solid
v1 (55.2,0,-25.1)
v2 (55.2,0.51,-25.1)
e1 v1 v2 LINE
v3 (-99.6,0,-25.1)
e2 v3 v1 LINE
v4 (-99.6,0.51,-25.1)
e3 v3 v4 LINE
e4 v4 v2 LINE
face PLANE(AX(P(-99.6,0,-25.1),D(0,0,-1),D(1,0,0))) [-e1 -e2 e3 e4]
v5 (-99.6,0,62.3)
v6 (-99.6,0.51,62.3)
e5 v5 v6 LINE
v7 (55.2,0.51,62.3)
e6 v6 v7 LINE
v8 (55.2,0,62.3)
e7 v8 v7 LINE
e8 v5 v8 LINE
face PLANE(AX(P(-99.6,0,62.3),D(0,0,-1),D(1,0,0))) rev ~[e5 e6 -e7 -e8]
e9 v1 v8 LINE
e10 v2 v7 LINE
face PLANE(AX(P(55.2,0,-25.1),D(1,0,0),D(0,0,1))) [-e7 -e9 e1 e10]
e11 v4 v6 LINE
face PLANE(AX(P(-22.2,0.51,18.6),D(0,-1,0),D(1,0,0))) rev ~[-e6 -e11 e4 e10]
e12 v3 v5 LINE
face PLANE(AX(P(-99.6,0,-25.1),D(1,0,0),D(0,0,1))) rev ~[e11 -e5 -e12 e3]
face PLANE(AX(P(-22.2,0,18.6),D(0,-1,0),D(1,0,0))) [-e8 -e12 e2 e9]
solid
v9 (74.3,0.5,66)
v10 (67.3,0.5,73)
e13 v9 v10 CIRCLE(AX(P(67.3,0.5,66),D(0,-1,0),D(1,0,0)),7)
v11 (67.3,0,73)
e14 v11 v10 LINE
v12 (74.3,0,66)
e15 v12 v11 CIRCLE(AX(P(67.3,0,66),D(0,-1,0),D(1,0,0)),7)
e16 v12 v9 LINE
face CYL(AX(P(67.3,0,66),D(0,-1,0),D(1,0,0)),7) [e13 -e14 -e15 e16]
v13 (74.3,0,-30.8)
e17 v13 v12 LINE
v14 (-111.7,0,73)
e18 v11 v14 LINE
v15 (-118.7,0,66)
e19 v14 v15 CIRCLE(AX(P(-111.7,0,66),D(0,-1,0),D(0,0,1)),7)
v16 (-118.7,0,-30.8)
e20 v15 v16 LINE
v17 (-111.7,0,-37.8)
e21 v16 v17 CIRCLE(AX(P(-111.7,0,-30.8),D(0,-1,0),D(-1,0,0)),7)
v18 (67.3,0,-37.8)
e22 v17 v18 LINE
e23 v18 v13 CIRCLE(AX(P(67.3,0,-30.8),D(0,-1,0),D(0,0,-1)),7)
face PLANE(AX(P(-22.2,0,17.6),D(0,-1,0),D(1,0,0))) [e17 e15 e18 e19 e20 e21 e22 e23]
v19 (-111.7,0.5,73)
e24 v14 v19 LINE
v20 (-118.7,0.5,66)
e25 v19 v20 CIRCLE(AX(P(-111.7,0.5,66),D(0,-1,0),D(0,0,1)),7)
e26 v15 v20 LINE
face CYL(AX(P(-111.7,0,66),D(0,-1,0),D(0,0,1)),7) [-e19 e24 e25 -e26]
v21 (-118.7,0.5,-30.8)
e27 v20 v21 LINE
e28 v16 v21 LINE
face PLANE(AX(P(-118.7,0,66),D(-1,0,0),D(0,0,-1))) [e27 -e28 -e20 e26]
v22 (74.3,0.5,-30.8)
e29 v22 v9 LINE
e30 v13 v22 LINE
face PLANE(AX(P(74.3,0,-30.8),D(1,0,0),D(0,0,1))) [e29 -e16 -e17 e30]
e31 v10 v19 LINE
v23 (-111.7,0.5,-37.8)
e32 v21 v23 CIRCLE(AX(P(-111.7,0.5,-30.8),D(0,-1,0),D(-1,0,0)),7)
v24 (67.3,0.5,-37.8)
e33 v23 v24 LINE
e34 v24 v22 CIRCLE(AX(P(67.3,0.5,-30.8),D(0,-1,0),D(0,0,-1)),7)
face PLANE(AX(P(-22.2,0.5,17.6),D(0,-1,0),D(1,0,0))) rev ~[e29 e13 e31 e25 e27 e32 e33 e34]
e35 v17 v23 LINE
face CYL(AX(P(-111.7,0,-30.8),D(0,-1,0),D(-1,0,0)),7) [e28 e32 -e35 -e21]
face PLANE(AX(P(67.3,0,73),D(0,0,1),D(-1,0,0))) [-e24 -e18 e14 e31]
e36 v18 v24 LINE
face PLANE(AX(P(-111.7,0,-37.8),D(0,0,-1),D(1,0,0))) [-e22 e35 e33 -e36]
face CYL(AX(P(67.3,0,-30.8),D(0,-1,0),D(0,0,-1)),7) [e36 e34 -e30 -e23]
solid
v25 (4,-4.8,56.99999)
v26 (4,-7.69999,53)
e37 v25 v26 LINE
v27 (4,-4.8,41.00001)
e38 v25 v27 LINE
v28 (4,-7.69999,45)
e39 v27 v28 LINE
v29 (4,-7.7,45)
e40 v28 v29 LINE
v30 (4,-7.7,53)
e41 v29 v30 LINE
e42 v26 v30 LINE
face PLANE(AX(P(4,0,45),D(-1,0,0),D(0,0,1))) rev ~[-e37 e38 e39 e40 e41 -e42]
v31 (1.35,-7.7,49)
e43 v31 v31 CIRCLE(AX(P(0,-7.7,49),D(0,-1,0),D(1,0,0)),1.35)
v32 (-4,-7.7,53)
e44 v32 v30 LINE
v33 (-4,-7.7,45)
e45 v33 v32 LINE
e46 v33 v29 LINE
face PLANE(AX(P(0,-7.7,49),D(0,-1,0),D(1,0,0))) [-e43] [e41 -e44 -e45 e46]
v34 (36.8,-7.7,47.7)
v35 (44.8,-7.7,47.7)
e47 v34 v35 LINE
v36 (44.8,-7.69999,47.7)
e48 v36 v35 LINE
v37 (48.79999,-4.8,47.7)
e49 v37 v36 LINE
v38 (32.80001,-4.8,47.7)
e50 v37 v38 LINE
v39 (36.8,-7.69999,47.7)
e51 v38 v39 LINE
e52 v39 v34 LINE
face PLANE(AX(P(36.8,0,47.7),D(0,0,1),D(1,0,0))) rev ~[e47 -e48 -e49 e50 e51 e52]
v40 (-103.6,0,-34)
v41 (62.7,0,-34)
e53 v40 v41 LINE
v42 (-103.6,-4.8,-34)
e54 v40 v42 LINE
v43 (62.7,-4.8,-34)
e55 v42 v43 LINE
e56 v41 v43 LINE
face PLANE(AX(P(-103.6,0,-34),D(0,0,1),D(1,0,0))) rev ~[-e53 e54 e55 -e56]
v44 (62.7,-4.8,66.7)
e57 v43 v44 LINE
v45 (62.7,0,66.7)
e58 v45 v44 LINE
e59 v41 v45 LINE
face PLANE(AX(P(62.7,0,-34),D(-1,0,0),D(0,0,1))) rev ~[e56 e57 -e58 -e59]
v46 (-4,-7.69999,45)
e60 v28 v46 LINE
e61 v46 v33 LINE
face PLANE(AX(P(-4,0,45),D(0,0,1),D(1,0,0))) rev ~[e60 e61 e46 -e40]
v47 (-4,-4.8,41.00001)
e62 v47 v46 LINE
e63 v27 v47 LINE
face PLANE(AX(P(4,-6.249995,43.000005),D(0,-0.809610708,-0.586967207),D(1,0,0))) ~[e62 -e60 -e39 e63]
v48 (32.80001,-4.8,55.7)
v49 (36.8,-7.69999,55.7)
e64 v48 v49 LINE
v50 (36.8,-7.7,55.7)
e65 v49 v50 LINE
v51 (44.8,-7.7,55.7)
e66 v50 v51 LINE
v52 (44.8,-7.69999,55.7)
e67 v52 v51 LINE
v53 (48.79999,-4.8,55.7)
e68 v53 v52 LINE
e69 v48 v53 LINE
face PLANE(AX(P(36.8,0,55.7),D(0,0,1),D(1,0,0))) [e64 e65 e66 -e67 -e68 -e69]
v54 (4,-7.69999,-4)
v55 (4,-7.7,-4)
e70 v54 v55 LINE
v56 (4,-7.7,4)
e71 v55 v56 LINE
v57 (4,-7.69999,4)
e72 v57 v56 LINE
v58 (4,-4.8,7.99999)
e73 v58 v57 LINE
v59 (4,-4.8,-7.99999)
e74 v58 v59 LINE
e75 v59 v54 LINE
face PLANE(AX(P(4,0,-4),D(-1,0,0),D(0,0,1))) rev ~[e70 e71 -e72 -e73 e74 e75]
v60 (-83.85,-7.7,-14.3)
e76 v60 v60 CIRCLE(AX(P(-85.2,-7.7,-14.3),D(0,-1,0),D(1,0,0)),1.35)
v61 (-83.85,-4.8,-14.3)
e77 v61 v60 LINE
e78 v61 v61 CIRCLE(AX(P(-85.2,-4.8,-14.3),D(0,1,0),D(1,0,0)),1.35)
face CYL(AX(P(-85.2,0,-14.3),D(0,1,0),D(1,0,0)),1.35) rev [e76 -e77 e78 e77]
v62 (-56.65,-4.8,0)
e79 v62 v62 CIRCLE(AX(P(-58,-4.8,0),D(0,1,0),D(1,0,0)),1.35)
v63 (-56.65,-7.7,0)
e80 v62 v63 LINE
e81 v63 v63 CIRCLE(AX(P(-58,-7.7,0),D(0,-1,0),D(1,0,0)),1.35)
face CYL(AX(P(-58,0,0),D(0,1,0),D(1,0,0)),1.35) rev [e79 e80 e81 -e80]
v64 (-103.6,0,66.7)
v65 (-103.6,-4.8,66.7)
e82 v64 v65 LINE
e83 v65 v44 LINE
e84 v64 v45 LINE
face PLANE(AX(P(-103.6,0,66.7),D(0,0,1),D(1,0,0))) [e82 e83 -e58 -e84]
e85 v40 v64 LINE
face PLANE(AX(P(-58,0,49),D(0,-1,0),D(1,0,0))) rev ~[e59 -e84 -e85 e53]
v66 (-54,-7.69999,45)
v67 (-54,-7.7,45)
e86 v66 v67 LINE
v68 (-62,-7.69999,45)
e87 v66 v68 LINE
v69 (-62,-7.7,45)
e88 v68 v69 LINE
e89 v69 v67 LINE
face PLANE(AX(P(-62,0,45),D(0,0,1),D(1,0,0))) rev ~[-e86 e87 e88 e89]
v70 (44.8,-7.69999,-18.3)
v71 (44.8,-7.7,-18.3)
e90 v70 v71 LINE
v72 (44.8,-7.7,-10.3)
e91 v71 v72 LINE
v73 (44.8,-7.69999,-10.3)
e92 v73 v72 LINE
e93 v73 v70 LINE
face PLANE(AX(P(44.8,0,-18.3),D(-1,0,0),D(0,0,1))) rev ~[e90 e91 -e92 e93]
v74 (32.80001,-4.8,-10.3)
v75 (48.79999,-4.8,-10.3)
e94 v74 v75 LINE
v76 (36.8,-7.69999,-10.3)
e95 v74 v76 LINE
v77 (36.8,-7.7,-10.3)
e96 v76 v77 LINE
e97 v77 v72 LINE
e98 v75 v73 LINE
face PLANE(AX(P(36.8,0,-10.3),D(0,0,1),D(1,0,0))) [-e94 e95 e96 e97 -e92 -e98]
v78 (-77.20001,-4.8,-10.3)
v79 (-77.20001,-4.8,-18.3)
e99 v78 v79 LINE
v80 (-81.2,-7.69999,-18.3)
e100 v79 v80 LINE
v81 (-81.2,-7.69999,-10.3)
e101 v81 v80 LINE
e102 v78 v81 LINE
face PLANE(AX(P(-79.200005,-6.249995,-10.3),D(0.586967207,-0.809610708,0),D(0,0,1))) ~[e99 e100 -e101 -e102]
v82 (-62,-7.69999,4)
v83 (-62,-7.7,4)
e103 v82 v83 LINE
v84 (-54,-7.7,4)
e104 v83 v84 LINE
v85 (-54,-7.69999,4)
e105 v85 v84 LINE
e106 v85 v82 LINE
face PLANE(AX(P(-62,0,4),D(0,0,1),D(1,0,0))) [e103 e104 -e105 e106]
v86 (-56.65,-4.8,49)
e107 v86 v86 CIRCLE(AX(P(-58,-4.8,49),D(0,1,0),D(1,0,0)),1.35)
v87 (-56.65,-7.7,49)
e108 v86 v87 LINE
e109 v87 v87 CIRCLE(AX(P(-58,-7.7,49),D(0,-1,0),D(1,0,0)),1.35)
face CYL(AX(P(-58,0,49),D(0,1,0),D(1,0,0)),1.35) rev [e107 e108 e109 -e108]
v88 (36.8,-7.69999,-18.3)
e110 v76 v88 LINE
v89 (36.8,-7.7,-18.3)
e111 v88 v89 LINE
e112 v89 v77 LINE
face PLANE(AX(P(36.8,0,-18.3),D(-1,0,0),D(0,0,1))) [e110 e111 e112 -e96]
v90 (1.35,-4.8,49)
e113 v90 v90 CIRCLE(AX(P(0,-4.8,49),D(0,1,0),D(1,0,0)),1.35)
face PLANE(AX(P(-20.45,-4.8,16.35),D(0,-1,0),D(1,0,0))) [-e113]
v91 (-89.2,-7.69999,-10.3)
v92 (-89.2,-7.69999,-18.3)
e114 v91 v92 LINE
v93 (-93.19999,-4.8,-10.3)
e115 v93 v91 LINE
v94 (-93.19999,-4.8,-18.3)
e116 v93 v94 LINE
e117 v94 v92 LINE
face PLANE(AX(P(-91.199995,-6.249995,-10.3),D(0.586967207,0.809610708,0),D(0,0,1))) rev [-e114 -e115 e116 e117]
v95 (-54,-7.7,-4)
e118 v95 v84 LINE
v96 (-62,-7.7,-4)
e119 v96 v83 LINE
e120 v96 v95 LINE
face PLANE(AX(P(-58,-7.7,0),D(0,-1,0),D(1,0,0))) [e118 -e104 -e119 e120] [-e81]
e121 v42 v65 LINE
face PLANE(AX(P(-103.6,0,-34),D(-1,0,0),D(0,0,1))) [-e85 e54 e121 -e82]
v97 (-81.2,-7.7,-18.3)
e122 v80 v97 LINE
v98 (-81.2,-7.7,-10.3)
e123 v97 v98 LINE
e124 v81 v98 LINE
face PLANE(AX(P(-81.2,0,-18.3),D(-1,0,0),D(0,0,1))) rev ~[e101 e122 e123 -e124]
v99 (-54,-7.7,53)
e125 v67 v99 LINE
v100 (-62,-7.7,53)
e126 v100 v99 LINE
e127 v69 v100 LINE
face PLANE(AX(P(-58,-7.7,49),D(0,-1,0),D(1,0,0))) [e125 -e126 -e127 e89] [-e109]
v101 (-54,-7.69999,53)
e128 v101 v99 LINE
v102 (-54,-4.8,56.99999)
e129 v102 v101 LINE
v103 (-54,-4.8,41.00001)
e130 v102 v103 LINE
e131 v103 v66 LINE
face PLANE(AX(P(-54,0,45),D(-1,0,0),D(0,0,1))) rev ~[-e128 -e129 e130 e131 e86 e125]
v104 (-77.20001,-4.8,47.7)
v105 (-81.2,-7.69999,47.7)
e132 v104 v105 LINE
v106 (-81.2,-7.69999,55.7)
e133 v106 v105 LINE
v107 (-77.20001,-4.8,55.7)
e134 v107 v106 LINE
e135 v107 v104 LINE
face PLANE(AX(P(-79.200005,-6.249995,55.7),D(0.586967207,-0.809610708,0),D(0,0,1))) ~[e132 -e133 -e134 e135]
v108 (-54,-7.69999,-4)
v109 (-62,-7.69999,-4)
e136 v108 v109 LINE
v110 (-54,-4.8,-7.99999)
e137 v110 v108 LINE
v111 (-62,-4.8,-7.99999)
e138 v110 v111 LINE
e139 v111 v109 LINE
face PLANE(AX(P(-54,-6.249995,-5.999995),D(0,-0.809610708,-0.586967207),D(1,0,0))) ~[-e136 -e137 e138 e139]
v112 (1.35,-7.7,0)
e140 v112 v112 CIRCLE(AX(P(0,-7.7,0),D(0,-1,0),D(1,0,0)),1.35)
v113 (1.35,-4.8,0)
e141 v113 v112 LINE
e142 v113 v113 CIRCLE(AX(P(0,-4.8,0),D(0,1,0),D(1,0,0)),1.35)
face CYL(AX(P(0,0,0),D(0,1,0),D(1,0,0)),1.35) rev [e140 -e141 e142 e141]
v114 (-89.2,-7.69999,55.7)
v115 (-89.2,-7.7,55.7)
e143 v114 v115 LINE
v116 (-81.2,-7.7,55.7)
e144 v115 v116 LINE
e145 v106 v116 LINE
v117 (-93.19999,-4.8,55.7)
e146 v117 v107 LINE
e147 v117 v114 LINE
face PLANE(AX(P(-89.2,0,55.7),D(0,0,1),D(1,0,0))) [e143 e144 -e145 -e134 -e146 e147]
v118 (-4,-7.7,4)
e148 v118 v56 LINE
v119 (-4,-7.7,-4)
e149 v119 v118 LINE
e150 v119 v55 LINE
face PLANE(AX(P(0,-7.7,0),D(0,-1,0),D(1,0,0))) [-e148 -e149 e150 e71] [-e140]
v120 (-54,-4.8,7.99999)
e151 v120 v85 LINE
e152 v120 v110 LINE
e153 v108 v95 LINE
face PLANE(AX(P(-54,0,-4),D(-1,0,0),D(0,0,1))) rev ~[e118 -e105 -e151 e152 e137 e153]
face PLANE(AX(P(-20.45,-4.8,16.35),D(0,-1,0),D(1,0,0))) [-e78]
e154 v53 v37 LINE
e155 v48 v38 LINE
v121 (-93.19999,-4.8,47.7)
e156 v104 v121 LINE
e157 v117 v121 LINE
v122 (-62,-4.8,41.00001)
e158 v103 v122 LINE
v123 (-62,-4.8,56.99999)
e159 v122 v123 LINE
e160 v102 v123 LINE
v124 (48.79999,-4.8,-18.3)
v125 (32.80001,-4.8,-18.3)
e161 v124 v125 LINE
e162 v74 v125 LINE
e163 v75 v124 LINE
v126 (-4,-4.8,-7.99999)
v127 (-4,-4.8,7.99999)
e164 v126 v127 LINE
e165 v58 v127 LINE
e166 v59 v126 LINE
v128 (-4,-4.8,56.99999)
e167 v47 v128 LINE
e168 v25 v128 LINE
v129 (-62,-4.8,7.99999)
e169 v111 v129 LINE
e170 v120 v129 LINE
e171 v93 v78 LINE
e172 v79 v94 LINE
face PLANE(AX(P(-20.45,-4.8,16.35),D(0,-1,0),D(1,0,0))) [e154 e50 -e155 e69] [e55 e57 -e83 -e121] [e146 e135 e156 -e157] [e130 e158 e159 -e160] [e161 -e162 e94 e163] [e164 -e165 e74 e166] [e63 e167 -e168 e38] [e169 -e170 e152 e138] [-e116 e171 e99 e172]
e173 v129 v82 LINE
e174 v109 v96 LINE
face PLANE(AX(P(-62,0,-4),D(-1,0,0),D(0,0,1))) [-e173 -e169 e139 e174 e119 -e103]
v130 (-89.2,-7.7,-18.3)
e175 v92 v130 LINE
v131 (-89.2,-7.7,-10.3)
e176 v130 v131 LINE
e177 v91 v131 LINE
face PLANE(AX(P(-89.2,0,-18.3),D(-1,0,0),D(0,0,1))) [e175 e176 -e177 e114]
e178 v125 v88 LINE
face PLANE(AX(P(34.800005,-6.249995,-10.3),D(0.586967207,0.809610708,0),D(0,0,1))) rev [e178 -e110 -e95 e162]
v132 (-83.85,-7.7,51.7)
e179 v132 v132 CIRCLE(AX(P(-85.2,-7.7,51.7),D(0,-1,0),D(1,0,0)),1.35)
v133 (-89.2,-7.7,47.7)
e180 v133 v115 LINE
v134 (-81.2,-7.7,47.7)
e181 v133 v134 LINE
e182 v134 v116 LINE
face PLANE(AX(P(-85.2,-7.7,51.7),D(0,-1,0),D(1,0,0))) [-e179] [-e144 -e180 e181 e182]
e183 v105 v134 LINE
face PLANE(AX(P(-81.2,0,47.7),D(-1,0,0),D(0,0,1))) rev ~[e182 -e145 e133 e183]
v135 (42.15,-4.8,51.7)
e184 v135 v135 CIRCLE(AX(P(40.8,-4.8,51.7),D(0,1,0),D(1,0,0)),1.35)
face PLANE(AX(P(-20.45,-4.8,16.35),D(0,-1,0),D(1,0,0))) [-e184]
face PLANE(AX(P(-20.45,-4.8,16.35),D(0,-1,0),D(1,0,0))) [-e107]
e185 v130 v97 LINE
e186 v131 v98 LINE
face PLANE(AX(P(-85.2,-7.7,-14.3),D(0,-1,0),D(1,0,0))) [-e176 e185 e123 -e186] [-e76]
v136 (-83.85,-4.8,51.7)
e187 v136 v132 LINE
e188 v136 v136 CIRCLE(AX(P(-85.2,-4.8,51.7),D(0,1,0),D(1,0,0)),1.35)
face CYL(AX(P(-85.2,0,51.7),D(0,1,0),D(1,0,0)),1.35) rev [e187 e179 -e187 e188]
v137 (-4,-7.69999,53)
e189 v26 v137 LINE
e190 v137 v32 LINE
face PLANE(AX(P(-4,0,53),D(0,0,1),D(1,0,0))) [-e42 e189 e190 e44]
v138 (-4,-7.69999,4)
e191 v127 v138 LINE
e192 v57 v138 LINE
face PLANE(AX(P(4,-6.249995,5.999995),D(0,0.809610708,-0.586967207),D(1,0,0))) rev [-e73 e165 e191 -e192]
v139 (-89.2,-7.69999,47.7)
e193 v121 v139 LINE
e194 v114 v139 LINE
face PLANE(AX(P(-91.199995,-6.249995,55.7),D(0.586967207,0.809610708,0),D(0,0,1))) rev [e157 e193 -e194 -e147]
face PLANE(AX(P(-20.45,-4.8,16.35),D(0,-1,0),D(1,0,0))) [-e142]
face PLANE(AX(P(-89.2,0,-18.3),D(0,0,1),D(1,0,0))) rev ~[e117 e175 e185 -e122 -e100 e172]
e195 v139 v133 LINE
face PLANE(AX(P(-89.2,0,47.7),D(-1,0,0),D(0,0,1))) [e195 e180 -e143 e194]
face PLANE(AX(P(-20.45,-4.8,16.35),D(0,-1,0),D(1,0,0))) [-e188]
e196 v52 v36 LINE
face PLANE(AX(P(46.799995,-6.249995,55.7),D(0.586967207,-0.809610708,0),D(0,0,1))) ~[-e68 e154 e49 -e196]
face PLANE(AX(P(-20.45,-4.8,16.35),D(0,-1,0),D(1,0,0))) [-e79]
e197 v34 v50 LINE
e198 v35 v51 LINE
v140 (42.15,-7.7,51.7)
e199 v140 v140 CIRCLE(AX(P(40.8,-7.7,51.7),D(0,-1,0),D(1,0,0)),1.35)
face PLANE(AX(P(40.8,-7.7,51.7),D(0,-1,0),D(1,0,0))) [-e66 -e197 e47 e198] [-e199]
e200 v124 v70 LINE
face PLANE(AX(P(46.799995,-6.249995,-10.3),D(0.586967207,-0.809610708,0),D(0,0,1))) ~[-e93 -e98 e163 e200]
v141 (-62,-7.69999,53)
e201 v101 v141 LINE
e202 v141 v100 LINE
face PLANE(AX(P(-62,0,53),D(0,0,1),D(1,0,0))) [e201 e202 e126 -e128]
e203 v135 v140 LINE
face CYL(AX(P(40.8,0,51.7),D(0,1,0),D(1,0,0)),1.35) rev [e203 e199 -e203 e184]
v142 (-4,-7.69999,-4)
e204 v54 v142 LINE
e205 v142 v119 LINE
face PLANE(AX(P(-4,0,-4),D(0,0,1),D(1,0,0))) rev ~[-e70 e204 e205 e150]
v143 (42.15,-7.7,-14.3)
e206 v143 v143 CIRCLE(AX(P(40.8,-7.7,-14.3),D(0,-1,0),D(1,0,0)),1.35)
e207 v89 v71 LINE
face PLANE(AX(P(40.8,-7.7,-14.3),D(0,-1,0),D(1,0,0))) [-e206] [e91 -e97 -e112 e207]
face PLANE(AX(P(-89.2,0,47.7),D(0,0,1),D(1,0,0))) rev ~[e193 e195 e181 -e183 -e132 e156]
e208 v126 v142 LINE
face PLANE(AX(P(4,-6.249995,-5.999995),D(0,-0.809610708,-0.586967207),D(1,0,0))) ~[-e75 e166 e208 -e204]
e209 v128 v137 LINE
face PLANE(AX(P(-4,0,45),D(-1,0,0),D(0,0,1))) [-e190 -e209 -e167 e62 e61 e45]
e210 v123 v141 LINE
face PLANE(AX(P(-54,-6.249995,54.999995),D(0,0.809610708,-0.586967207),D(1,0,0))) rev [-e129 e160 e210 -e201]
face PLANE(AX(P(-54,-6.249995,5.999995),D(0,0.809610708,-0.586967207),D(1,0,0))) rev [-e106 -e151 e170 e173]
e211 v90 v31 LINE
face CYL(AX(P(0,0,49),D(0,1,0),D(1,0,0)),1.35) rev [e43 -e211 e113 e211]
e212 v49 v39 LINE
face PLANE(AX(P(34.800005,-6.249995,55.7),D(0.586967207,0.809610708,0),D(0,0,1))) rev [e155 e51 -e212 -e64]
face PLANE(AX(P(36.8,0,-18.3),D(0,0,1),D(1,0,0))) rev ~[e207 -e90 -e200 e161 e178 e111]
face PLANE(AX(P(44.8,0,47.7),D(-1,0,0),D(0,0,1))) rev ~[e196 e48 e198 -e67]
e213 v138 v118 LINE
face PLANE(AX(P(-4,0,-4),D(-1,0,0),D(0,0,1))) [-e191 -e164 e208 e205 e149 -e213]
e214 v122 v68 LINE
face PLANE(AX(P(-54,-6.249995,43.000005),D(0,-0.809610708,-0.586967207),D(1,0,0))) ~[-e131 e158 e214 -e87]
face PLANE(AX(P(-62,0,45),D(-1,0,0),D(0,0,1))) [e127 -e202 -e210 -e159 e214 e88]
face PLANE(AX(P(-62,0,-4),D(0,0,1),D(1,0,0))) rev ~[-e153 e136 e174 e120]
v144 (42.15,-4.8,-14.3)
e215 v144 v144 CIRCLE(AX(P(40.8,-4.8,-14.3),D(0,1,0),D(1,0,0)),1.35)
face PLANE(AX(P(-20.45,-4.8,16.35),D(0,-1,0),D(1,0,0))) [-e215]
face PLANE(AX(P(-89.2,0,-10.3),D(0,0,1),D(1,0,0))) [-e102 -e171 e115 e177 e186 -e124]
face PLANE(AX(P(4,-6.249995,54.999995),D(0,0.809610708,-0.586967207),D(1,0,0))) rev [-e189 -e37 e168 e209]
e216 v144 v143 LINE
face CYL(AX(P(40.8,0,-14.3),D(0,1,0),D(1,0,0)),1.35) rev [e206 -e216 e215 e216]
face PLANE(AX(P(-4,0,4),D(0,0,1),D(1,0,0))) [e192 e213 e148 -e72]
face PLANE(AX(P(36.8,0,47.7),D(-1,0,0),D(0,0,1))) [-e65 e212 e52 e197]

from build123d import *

# Parameters (mm, degrees)
F0_W     = 166.3
F0_H     = 100.7
F0_W_2   = 154.8
F0_H_2   = 87.4
F0_W_3   = 8
F0_H_3   = 8
F0_R     = 1.35
F1_DEPTH = 0.5
F2_DEPTH = 4.8
F3_DEPTH = 7.7
F4_SIZE2 = 2.89999
F4_SIZE  = 3.99999
F5_DEPTH = 0.51


# Not quite as in the source:
# - a fillet or chamfer is up to 0.001 mm smaller than in the source, because OpenCascade refuses the exact size


with BuildPart() as f1:
    # F0 (on Front) → F1 (new body)
    with BuildSketch(Plane.XZ):
        with BuildLine():
            Line((67.3, 73), (-111.7, 73))
            ThreePointArc((-111.7, 73), (-116.6497474683, 70.9497474683), (-118.7, 66))
            Line((-118.7, 66), (-118.7, -30.8))
            ThreePointArc((-118.7, -30.8), (-116.6497474683, -35.7497474683), (-111.7, -37.8))
            Line((-111.7, -37.8), (67.3, -37.8))
            ThreePointArc((67.3, -37.8), (72.2497474683, -35.7497474683), (74.3, -30.8))
            Line((74.3, -30.8), (74.3, 66))
            ThreePointArc((74.3, 66), (72.2497474683, 70.9497474683), (67.3, 73))
        make_face()
        with Locations((-20.45, 16.35)):
            Rectangle(F0_W, F0_H, mode=Mode.SUBTRACT)
        with Locations((-20.45, 16.35)):
            Rectangle(F0_W, F0_H)
        with Locations((-22.2, 18.6)):
            Rectangle(F0_W_2, F0_H_2, mode=Mode.SUBTRACT)
        with Locations((-22.2, 18.6)):
            Rectangle(F0_W_2, F0_H_2)
        with Locations((-85.2, -14.3)):
            Rectangle(F0_W_3, F0_H_3, mode=Mode.SUBTRACT)
        with Locations((-58, 0)):
            Rectangle(F0_W_3, F0_H_3, mode=Mode.SUBTRACT)
        with Locations((40.8, -14.3)):
            Rectangle(F0_W_3, F0_H_3, mode=Mode.SUBTRACT)
        Rectangle(F0_W_3, F0_H_3, mode=Mode.SUBTRACT)
        with Locations((-85.2, 51.7)):
            Rectangle(F0_W_3, F0_H_3, mode=Mode.SUBTRACT)
        with Locations((-58, 49)):
            Rectangle(F0_W_3, F0_H_3, mode=Mode.SUBTRACT)
        with Locations((0, 49)):
            Rectangle(F0_W_3, F0_H_3, mode=Mode.SUBTRACT)
        with Locations((40.8, 51.7)):
            Rectangle(F0_W_3, F0_H_3, mode=Mode.SUBTRACT)
        with Locations((-58, 49)):
            Rectangle(F0_W_3, F0_H_3)
        with Locations((-58, 49)):
            Circle(F0_R, mode=Mode.SUBTRACT)
        with Locations((-85.2, 51.7)):
            Rectangle(F0_W_3, F0_H_3)
        with Locations((-85.2, 51.7)):
            Circle(F0_R, mode=Mode.SUBTRACT)
        with Locations((40.8, 51.7)):
            Rectangle(F0_W_3, F0_H_3)
        with Locations((40.8, 51.7)):
            Circle(F0_R, mode=Mode.SUBTRACT)
        Rectangle(F0_W_3, F0_H_3)
        Circle(F0_R, mode=Mode.SUBTRACT)
        with Locations((40.8, -14.3)):
            Rectangle(F0_W_3, F0_H_3)
        with Locations((40.8, -14.3)):
            Circle(F0_R, mode=Mode.SUBTRACT)
        with Locations((0, 49)):
            Rectangle(F0_W_3, F0_H_3)
        with Locations((0, 49)):
            Circle(F0_R, mode=Mode.SUBTRACT)
        with Locations((-58, 0)):
            Rectangle(F0_W_3, F0_H_3)
        with Locations((-58, 0)):
            Circle(F0_R, mode=Mode.SUBTRACT)
        with Locations((-85.2, -14.3)):
            Rectangle(F0_W_3, F0_H_3)
        with Locations((-85.2, -14.3)):
            Circle(F0_R, mode=Mode.SUBTRACT)
        with Locations((0, 49)):
            Circle(F0_R)
        with Locations((40.8, 51.7)):
            Circle(F0_R)
        with Locations((40.8, -14.3)):
            Circle(F0_R)
        Circle(F0_R)
        with Locations((-58, 49)):
            Circle(F0_R)
        with Locations((-58, 0)):
            Circle(F0_R)
        with Locations((-85.2, 51.7)):
            Circle(F0_R)
        with Locations((-85.2, -14.3)):
            Circle(F0_R)
    extrude(amount=-F1_DEPTH)


with BuildPart() as f2:
    # F0 (on Front) → F2 (new body)
    with BuildSketch(Plane.XZ):
        with Locations((-20.45, 16.35)):
            Rectangle(F0_W, F0_H)
        with Locations((-22.2, 18.6)):
            Rectangle(F0_W_2, F0_H_2, mode=Mode.SUBTRACT)
        with Locations((-22.2, 18.6)):
            Rectangle(F0_W_2, F0_H_2)
        with Locations((-85.2, -14.3)):
            Rectangle(F0_W_3, F0_H_3, mode=Mode.SUBTRACT)
        with Locations((-58, 0)):
            Rectangle(F0_W_3, F0_H_3, mode=Mode.SUBTRACT)
        with Locations((40.8, -14.3)):
            Rectangle(F0_W_3, F0_H_3, mode=Mode.SUBTRACT)
        Rectangle(F0_W_3, F0_H_3, mode=Mode.SUBTRACT)
        with Locations((-85.2, 51.7)):
            Rectangle(F0_W_3, F0_H_3, mode=Mode.SUBTRACT)
        with Locations((-58, 49)):
            Rectangle(F0_W_3, F0_H_3, mode=Mode.SUBTRACT)
        with Locations((0, 49)):
            Rectangle(F0_W_3, F0_H_3, mode=Mode.SUBTRACT)
        with Locations((40.8, 51.7)):
            Rectangle(F0_W_3, F0_H_3, mode=Mode.SUBTRACT)
        with Locations((40.8, 51.7)):
            Rectangle(F0_W_3, F0_H_3)
        with Locations((40.8, 51.7)):
            Circle(F0_R, mode=Mode.SUBTRACT)
        with Locations((0, 49)):
            Rectangle(F0_W_3, F0_H_3)
        with Locations((0, 49)):
            Circle(F0_R, mode=Mode.SUBTRACT)
        with Locations((-58, 49)):
            Rectangle(F0_W_3, F0_H_3)
        with Locations((-58, 49)):
            Circle(F0_R, mode=Mode.SUBTRACT)
        with Locations((-85.2, 51.7)):
            Rectangle(F0_W_3, F0_H_3)
        with Locations((-85.2, 51.7)):
            Circle(F0_R, mode=Mode.SUBTRACT)
        with Locations((-58, 0)):
            Rectangle(F0_W_3, F0_H_3)
        with Locations((-58, 0)):
            Circle(F0_R, mode=Mode.SUBTRACT)
        with Locations((-85.2, -14.3)):
            Rectangle(F0_W_3, F0_H_3)
        with Locations((-85.2, -14.3)):
            Circle(F0_R, mode=Mode.SUBTRACT)
        Rectangle(F0_W_3, F0_H_3)
        Circle(F0_R, mode=Mode.SUBTRACT)
        with Locations((40.8, -14.3)):
            Rectangle(F0_W_3, F0_H_3)
        with Locations((40.8, -14.3)):
            Circle(F0_R, mode=Mode.SUBTRACT)
        with Locations((40.8, 51.7)):
            Circle(F0_R)
        with Locations((0, 49)):
            Circle(F0_R)
        with Locations((-58, 49)):
            Circle(F0_R)
        with Locations((-85.2, 51.7)):
            Circle(F0_R)
        with Locations((-58, 0)):
            Circle(F0_R)
        with Locations((-85.2, -14.3)):
            Circle(F0_R)
        Circle(F0_R)
        with Locations((40.8, -14.3)):
            Circle(F0_R)
    extrude(amount=F2_DEPTH)

    # F0 (on Front) → F3 (join)
    with BuildSketch(Plane.XZ):
        with Locations((-58, 49)):
            Rectangle(F0_W_3, F0_H_3)
        with Locations((-58, 49)):
            Circle(F0_R, mode=Mode.SUBTRACT)
        with Locations((0, 49)):
            Rectangle(F0_W_3, F0_H_3)
        with Locations((0, 49)):
            Circle(F0_R, mode=Mode.SUBTRACT)
        with Locations((40.8, 51.7)):
            Rectangle(F0_W_3, F0_H_3)
        with Locations((40.8, 51.7)):
            Circle(F0_R, mode=Mode.SUBTRACT)
        with Locations((40.8, -14.3)):
            Rectangle(F0_W_3, F0_H_3)
        with Locations((40.8, -14.3)):
            Circle(F0_R, mode=Mode.SUBTRACT)
        Rectangle(F0_W_3, F0_H_3)
        Circle(F0_R, mode=Mode.SUBTRACT)
        with Locations((-58, 0)):
            Rectangle(F0_W_3, F0_H_3)
        with Locations((-58, 0)):
            Circle(F0_R, mode=Mode.SUBTRACT)
        with Locations((-85.2, -14.3)):
            Rectangle(F0_W_3, F0_H_3)
        with Locations((-85.2, -14.3)):
            Circle(F0_R, mode=Mode.SUBTRACT)
        with Locations((-85.2, 51.7)):
            Rectangle(F0_W_3, F0_H_3)
        with Locations((-85.2, 51.7)):
            Circle(F0_R, mode=Mode.SUBTRACT)
    extrude(amount=F3_DEPTH)

    # F4 (size 4 and 2.9 in the source; OpenCascade refuses exactly that, so slightly less here)
    f4_edges = [f2.edges().sort_by_distance(p)[0] for p in [
        (-58, -4.8, 53),
        (-58, -4.8, 45),
        (-89.2, -4.8, 51.7),
        (-81.2, -4.8, 51.7),
        (0, -4.8, 45),
        (0, -4.8, -4),
        (44.8, -4.8, -14.3),
        (44.8, -4.8, 51.7),
        (-58, -4.8, -4),
        (-81.2, -4.8, -14.3),
        (-89.2, -4.8, -14.3),
        (36.8, -4.8, 51.7),
        (36.8, -4.8, -14.3),
        (0, -4.8, 53),
        (0, -4.8, 4),
        (-58, -4.8, 4),
    ]]
    chamfer(f4_edges, length=F4_SIZE, length2=F4_SIZE2)


with BuildPart() as f5:
    # F0 (on Front) → F5 (new body)
    with BuildSketch(Plane.XZ):
        with Locations((-22.2, 18.6)):
            Rectangle(F0_W_2, F0_H_2)
        with Locations((-85.2, -14.3)):
            Rectangle(F0_W_3, F0_H_3, mode=Mode.SUBTRACT)
        with Locations((-58, 0)):
            Rectangle(F0_W_3, F0_H_3, mode=Mode.SUBTRACT)
        with Locations((40.8, -14.3)):
            Rectangle(F0_W_3, F0_H_3, mode=Mode.SUBTRACT)
        Rectangle(F0_W_3, F0_H_3, mode=Mode.SUBTRACT)
        with Locations((-85.2, 51.7)):
            Rectangle(F0_W_3, F0_H_3, mode=Mode.SUBTRACT)
        with Locations((-58, 49)):
            Rectangle(F0_W_3, F0_H_3, mode=Mode.SUBTRACT)
        with Locations((0, 49)):
            Rectangle(F0_W_3, F0_H_3, mode=Mode.SUBTRACT)
        with Locations((40.8, 51.7)):
            Rectangle(F0_W_3, F0_H_3, mode=Mode.SUBTRACT)
        with Locations((40.8, 51.7)):
            Rectangle(F0_W_3, F0_H_3)
        with Locations((40.8, 51.7)):
            Circle(F0_R, mode=Mode.SUBTRACT)
        with Locations((40.8, -14.3)):
            Rectangle(F0_W_3, F0_H_3)
        with Locations((40.8, -14.3)):
            Circle(F0_R, mode=Mode.SUBTRACT)
        with Locations((0, 49)):
            Rectangle(F0_W_3, F0_H_3)
        with Locations((0, 49)):
            Circle(F0_R, mode=Mode.SUBTRACT)
        with Locations((-58, 49)):
            Rectangle(F0_W_3, F0_H_3)
        with Locations((-58, 49)):
            Circle(F0_R, mode=Mode.SUBTRACT)
        with Locations((-85.2, 51.7)):
            Rectangle(F0_W_3, F0_H_3)
        with Locations((-85.2, 51.7)):
            Circle(F0_R, mode=Mode.SUBTRACT)
        with Locations((-58, 0)):
            Rectangle(F0_W_3, F0_H_3)
        with Locations((-58, 0)):
            Circle(F0_R, mode=Mode.SUBTRACT)
        with Locations((-85.2, -14.3)):
            Rectangle(F0_W_3, F0_H_3)
        with Locations((-85.2, -14.3)):
            Circle(F0_R, mode=Mode.SUBTRACT)
        Rectangle(F0_W_3, F0_H_3)
        Circle(F0_R, mode=Mode.SUBTRACT)
        with Locations((40.8, 51.7)):
            Circle(F0_R)
        with Locations((40.8, -14.3)):
            Circle(F0_R)
        Circle(F0_R)
        with Locations((0, 49)):
            Circle(F0_R)
        with Locations((-58, 49)):
            Circle(F0_R)
        with Locations((-58, 0)):
            Circle(F0_R)
        with Locations((-85.2, 51.7)):
            Circle(F0_R)
        with Locations((-85.2, -14.3)):
            Circle(F0_R)
    extrude(amount=-F5_DEPTH)


solid = Compound([f1.part, f2.part, f5.part])
